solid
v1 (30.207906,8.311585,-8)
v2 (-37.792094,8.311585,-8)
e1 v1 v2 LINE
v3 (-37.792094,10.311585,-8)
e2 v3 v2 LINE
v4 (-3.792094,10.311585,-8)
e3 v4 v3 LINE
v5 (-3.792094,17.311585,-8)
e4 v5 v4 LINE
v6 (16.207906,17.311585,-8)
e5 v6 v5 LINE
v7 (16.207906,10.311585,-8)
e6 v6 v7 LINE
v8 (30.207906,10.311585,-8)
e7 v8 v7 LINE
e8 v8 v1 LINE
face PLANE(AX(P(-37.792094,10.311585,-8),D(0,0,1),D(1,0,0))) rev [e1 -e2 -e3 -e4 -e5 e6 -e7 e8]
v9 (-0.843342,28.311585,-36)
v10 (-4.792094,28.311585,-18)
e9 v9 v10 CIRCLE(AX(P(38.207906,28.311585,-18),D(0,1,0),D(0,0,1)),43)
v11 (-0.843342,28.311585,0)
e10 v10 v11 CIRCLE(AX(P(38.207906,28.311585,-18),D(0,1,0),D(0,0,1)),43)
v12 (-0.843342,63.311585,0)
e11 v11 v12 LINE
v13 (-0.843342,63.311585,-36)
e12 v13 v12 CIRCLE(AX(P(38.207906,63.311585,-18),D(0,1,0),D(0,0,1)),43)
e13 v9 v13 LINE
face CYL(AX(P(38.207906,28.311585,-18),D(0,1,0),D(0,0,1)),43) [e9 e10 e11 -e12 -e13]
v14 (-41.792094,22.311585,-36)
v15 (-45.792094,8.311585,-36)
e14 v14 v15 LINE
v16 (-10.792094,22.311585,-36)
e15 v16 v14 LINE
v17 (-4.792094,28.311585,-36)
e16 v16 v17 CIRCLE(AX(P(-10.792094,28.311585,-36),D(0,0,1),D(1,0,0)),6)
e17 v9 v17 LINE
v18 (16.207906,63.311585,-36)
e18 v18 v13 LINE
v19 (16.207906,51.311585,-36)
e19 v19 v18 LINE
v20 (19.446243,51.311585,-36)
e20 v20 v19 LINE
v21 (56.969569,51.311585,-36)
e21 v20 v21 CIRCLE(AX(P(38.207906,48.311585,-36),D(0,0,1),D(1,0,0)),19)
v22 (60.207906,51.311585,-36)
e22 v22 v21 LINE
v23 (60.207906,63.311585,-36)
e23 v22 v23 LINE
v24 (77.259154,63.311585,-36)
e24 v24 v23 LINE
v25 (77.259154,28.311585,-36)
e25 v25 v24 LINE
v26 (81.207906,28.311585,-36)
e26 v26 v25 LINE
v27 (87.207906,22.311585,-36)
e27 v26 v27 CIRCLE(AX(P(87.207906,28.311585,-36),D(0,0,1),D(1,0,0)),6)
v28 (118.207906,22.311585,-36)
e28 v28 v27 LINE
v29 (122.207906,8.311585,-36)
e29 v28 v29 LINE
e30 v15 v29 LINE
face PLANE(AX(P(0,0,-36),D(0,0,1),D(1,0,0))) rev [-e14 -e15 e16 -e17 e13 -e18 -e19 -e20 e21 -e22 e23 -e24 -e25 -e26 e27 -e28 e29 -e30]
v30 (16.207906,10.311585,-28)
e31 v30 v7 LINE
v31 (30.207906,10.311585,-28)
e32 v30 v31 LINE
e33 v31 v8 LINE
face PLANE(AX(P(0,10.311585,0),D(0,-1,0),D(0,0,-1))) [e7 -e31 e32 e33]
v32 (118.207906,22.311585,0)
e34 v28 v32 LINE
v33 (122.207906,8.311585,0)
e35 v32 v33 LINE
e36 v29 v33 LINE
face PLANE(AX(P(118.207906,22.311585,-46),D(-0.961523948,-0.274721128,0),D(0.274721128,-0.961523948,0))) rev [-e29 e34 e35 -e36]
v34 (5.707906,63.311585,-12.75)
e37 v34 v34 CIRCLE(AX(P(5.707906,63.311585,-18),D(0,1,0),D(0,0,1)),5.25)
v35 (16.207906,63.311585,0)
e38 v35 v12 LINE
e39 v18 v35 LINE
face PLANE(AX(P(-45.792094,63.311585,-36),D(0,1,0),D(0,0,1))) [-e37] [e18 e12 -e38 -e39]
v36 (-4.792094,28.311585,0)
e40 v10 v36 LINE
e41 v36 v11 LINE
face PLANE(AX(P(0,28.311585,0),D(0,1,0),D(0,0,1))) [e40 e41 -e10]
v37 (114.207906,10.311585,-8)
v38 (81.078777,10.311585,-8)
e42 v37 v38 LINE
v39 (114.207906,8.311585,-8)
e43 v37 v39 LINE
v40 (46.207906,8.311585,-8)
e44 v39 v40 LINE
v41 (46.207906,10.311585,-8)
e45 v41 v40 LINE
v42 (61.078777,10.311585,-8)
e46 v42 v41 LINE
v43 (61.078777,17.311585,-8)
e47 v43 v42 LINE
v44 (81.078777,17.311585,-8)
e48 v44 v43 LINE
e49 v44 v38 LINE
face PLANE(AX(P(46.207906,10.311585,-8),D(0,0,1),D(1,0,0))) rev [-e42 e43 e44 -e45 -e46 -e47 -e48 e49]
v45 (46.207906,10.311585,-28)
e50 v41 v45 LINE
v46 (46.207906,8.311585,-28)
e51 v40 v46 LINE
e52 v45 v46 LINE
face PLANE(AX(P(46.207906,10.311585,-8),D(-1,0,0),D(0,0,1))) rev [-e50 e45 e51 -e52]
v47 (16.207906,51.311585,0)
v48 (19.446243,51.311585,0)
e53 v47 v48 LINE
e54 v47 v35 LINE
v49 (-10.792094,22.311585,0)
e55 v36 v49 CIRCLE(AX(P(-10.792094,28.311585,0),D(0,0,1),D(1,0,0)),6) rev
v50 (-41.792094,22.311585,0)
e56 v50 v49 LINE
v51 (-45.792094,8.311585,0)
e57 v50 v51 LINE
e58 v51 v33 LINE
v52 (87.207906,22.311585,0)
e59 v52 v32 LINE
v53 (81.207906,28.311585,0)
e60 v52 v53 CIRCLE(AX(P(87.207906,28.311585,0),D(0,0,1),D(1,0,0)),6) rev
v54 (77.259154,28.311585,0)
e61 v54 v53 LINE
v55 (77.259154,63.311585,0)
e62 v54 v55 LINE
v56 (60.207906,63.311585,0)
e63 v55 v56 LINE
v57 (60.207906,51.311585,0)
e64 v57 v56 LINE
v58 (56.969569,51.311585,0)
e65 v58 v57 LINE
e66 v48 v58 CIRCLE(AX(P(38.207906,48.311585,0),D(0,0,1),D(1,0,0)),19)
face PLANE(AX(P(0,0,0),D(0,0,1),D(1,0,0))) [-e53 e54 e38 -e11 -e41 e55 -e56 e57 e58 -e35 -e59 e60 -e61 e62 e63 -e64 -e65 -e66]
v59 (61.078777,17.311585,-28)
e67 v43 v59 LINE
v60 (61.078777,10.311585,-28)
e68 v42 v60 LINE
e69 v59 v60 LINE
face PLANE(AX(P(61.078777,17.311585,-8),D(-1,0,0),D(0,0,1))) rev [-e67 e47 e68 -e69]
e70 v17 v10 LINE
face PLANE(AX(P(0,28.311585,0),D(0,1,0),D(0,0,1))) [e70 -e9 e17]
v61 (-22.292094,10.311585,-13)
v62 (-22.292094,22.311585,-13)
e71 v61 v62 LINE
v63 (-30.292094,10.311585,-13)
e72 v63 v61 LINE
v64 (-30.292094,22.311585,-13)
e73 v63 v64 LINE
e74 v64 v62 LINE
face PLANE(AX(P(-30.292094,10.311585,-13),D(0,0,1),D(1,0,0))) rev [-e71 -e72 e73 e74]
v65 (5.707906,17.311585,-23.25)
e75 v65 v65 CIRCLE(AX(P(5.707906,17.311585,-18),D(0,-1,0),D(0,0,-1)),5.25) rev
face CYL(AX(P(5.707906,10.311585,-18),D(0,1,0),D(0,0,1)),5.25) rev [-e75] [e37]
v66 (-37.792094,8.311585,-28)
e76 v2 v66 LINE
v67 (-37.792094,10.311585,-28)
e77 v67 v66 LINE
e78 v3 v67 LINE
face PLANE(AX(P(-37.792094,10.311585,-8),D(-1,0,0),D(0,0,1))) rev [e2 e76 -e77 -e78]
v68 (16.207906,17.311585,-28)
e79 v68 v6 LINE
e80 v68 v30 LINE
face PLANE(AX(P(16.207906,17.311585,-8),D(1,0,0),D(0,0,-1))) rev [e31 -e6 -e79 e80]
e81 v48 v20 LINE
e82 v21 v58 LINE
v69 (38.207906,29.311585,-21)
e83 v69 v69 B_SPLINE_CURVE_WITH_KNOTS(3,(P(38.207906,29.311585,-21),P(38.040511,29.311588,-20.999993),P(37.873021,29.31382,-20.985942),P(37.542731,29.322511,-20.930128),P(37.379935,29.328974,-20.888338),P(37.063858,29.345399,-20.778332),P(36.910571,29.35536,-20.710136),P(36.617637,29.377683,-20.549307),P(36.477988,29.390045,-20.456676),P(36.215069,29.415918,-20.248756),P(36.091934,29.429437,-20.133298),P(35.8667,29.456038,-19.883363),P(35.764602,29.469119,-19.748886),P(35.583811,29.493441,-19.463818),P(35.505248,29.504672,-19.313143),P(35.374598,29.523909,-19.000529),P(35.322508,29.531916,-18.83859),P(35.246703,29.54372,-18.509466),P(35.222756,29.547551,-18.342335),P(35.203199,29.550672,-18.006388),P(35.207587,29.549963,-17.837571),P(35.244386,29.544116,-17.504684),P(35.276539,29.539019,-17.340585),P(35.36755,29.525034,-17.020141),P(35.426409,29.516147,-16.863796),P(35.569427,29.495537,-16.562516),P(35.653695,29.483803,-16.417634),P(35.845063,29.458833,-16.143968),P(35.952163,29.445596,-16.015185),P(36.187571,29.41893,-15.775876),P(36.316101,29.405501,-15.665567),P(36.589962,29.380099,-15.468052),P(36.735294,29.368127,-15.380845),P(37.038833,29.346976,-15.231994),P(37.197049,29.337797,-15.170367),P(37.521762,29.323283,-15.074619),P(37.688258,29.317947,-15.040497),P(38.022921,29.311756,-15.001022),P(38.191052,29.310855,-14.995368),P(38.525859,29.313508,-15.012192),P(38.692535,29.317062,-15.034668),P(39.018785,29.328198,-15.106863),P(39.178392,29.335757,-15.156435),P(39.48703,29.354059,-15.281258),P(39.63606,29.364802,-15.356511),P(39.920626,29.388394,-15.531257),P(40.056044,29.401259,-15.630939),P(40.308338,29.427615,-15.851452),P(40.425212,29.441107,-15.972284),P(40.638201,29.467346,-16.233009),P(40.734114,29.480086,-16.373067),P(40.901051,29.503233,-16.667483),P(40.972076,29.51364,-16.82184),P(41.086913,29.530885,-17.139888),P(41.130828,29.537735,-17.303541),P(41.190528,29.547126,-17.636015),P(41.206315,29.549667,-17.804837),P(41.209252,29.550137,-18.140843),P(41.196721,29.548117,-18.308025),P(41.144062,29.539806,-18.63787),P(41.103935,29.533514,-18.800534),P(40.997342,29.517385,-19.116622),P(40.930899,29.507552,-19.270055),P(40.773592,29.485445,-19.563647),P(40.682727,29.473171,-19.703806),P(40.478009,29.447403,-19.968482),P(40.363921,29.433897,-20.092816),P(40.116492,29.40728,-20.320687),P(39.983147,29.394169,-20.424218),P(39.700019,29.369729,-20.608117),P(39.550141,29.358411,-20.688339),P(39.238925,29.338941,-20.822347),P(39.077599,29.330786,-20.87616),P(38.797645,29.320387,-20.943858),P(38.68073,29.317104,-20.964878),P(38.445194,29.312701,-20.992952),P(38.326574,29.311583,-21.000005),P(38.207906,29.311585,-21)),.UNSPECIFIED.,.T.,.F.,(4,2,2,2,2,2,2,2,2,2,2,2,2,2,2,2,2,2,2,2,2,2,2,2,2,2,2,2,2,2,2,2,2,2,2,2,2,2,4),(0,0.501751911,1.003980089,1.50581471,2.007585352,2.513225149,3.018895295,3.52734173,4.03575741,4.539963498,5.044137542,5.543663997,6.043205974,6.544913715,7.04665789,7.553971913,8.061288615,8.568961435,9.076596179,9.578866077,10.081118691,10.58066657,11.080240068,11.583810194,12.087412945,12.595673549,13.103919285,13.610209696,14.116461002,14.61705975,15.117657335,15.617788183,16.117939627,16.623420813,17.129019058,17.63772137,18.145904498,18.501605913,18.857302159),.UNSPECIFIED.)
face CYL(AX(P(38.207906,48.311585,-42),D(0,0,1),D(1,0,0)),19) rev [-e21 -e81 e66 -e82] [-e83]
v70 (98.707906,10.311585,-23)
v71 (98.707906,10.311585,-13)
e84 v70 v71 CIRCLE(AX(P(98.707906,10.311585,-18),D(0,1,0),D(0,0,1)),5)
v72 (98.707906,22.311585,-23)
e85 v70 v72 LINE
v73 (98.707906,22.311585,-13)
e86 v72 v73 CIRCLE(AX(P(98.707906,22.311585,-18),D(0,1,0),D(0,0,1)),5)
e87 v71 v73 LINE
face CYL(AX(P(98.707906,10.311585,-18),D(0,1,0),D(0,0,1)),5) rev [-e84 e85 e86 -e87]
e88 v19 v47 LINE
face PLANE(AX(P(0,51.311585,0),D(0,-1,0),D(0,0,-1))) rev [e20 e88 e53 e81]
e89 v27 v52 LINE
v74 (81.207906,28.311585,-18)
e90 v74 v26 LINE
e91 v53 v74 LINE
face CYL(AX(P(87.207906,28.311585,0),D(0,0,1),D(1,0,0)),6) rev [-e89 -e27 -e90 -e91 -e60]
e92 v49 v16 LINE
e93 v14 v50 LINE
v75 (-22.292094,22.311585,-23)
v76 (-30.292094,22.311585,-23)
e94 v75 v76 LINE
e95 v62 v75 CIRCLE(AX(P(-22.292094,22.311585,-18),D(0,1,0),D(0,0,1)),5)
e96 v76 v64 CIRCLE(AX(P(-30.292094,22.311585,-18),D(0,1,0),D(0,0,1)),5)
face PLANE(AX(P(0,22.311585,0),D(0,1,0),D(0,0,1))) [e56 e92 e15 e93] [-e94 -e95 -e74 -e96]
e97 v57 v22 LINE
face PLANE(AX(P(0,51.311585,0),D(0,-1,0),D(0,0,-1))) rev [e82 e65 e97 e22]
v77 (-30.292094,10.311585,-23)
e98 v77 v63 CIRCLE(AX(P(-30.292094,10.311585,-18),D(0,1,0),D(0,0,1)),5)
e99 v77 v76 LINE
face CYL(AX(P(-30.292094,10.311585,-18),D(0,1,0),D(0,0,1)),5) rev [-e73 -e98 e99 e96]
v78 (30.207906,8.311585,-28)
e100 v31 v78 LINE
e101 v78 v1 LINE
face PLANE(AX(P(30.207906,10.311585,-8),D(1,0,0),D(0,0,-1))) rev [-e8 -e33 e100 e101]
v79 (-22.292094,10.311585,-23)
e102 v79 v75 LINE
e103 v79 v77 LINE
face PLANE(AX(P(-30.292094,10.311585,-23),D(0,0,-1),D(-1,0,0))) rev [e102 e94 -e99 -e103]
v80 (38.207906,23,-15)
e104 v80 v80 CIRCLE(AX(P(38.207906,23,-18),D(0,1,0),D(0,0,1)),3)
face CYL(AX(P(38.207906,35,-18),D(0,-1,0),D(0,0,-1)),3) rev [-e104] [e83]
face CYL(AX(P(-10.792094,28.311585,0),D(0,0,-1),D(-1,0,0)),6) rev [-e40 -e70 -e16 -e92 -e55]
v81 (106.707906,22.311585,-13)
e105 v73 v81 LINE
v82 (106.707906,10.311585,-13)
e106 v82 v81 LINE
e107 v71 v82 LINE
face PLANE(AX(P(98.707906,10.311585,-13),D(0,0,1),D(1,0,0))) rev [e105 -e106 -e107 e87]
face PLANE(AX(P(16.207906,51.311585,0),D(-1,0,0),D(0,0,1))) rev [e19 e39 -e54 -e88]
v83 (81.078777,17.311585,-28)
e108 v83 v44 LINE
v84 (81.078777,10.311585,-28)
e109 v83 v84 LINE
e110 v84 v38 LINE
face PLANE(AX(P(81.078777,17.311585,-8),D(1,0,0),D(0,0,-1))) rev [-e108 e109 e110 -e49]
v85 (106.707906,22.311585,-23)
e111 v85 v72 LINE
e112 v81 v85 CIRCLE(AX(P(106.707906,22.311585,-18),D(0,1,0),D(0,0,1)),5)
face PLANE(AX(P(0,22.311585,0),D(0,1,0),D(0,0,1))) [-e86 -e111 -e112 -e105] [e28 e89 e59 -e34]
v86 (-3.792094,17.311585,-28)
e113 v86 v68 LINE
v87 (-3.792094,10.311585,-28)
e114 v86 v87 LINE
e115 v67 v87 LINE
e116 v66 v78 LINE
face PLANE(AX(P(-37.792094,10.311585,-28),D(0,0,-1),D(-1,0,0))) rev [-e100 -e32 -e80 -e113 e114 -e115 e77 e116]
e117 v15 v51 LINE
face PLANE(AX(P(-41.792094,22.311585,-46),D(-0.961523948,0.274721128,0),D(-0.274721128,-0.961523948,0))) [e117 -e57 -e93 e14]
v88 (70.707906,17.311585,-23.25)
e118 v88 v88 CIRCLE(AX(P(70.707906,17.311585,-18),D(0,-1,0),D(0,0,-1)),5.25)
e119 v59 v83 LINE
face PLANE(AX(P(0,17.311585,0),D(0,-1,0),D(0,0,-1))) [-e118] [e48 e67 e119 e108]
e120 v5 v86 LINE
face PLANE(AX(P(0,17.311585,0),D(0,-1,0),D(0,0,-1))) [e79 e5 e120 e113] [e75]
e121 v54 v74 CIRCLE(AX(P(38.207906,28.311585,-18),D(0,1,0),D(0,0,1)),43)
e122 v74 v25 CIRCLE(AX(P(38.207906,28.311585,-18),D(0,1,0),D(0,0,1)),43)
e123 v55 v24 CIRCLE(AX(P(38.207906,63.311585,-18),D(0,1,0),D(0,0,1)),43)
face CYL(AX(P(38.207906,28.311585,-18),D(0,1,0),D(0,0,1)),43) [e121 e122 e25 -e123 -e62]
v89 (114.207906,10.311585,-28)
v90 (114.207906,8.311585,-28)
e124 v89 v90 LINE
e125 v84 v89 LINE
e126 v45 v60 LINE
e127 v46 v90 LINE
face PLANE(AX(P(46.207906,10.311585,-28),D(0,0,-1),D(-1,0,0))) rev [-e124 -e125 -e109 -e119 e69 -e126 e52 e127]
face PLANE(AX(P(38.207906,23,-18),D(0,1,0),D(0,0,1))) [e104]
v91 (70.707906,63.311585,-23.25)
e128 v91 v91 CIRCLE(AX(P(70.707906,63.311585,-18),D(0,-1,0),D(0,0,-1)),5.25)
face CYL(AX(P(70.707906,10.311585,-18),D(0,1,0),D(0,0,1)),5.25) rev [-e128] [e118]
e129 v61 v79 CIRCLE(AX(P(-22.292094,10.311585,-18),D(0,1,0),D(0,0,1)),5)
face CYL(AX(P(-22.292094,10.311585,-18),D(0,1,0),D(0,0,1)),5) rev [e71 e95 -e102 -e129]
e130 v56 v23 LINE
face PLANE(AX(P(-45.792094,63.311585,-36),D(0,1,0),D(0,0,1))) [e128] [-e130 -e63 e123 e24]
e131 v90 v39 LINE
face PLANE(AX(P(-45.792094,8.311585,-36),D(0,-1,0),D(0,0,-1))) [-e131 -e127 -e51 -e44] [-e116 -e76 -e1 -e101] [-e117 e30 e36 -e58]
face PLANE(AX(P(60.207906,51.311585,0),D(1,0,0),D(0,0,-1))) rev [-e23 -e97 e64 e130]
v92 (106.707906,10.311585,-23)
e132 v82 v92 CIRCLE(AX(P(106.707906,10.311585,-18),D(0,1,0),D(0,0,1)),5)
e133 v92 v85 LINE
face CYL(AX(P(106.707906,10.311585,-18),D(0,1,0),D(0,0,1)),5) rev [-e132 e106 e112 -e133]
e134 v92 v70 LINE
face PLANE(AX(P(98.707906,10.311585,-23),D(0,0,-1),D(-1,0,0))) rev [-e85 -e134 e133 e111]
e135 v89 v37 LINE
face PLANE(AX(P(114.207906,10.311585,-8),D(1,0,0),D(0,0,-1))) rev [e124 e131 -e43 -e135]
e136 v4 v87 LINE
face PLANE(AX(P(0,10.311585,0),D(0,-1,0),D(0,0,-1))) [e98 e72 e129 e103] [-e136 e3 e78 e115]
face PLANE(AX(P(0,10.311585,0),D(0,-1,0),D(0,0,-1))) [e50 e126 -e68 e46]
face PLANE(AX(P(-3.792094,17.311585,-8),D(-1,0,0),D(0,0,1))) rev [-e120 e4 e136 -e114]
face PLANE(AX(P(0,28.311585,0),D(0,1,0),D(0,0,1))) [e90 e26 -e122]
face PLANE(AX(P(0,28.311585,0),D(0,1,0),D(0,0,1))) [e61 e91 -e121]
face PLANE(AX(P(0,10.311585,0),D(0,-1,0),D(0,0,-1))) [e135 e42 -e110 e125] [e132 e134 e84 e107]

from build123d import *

# Parameters (mm, degrees)
SKETCH1_W                = 168
SKETCH1_H                = 55
BOSS_EXTRUDE2_DEPTH      = 36
CUT_EXTRUDE2_DEPTH       = 41
CUT_EXTRUDE4_DEPTH       = 35
SKETCH5_W                = 44
SKETCH5_H                = 36
CUT_EXTRUDE5_DEPTH       = 12
CUT_EXTRUDE6_DEPTH       = 42
SKETCH11_R               = 5.25
CUT_EXTRUDE8_DEPTH       = 53
CUT_EXTRUDE9_DEPTH       = 46
FILLET1_R                = 6
SKETCH30_W               = 68
SKETCH30_H               = 20
CUT_EXTRUDE14_DEPTH      = 2
CUT_EXTRUDE16_DEPTH      = 6
CUT_EXTRUDE16_DEPTH_BACK = 6
SKETCH31_R               = 3
SKETCH32_W               = 20
SKETCH32_H               = 20
CUT_EXTRUDE19_DEPTH      = 7
CUT_EXTRUDE21_DEPTH      = 12


with BuildPart() as part:
    # Sketch1 → Boss-Extrude2 (new body)
    with BuildSketch(Plane.XY):
        with Locations((38.207905975, 35.811584747)):
            Rectangle(SKETCH1_W, SKETCH1_H)
    extrude(amount=-BOSS_EXTRUDE2_DEPTH)

    # Sketch3 → Cut-Extrude2 (cut)
    with BuildSketch(Plane(origin=(0, 63.311584747, 0), x_dir=(1, 0, 0), z_dir=(0, 1, 0))):
        Polygon((122.207905975, 36), (81.207905975, 36), (81.207905975, 18.000000234), (81.207905975, 0), (122.207905975, 0), align=None)
        Polygon((-4.792094025, 18), (-4.792094025, 36), (-45.792094025, 36), (-45.792094025, 0), (-4.792094025, 0), align=None)
    extrude(amount=-CUT_EXTRUDE2_DEPTH, mode=Mode.SUBTRACT)

    # Sketch4 → Cut-Extrude4 (cut)
    with BuildSketch(Plane(origin=(0, 63.311584747, 0), x_dir=(1, 0, 0), z_dir=(0, 1, 0))):
        with BuildLine():
            Line((-0.843342405, 36), (-4.792094025, 36))
            Line((-4.792094025, 36), (-4.792094025, 18))
            ThreePointArc((-4.792094025, 18), (-3.793306391, 27.214019744), (-0.843342405, 36))
        make_face()
        with BuildLine():
            ThreePointArc((-0.843342405, 0), (-3.793306391, 8.785980256), (-4.792094025, 18))
            Line((-4.792094025, 18), (-4.792094025, 0))
            Line((-4.792094025, 0), (-0.843342405, 0))
        make_face()
        with BuildLine():
            Line((81.207905975, 36), (77.259154354, 36))
            ThreePointArc((77.259154354, 36), (80.20911834, 27.214019744), (81.207905975, 18))
            Line((81.207905975, 18), (81.207905975, 36))
        make_face()
        with BuildLine():
            ThreePointArc((81.207905975, 18), (80.20911834, 8.785980256), (77.259154354, 0))
            Line((77.259154354, 0), (81.207905975, 0))
            Line((81.207905975, 0), (81.207905975, 18))
        make_face()
    extrude(amount=-CUT_EXTRUDE4_DEPTH, mode=Mode.SUBTRACT)

    # Sketch5 → Cut-Extrude5 (cut)
    with BuildSketch(Plane(origin=(0, 63.311584747, 0), x_dir=(1, 0, 0), z_dir=(0, 1, 0))):
        with Locations((38.207905975, 18)):
            Rectangle(SKETCH5_W, SKETCH5_H)
    extrude(amount=-CUT_EXTRUDE5_DEPTH, mode=Mode.SUBTRACT)

    # Sketch8 → Cut-Extrude6 (cut)
    with BuildSketch(Plane.XY):
        with BuildLine():
            ThreePointArc((19.446242935, 51.311584747), (36.703179712, 29.37126271), (57.207905975, 48.311584747))
            ThreePointArc((57.207905975, 48.311584747), (57.148228012, 49.81631101), (56.969569014, 51.311584747))
            Line((56.969569014, 51.311584747), (19.446242935, 51.311584747))
        make_face()
        with BuildLine():
            Line((19.446242935, 51.311584747), (56.969569014, 51.311584747))
            ThreePointArc((56.969569014, 51.311584747), (38.207905975, 67.311584747), (19.446242935, 51.311584747))
        make_face()
    extrude(amount=-CUT_EXTRUDE6_DEPTH, mode=Mode.SUBTRACT)

    # Sketch11 → Cut-Extrude8 (cut)
    with BuildSketch(Plane(origin=(0, 63.311584747, 0), x_dir=(1, 0, 0), z_dir=(0, 1, 0))):
        with Locations(Location((5.707905975, 18, 0), (0, 0, 270))):
            Circle(SKETCH11_R)
        with Locations(Location((70.707905975, 18, 0), (0, 0, 90))):
            Circle(SKETCH11_R)
    extrude(amount=-CUT_EXTRUDE8_DEPTH, mode=Mode.SUBTRACT)

    # Sketch13 → Cut-Extrude9 (cut)
    with BuildSketch(Plane.XY):
        Polygon((-45.792094025, 22.311584747), (-45.792094025, 8.311584747), (-41.792094025, 22.311584747), align=None)
        Polygon((122.207905975, 22.311584747), (118.207905975, 22.311584747), (122.207905975, 8.311584747), align=None)
    extrude(amount=-CUT_EXTRUDE9_DEPTH, mode=Mode.SUBTRACT)

    # Fillet1
    fillet1_edges = [part.edges().sort_by_distance(p)[0] for p in [
        (81.207905975, 22.311584747, -18),
        (-4.792094025, 22.311584747, -18),
    ]]
    fillet(fillet1_edges, radius=FILLET1_R - 0.0001)  # a hair under: the kernel refuses the full size

    # Sketch30 → Cut-Extrude14 (cut)
    with BuildSketch(Plane.XZ.offset(-8.311584747)):
        with Locations((-3.792094025, -18)):
            Rectangle(SKETCH30_W, SKETCH30_H)
        with Locations((80.207905975, -18)):
            Rectangle(SKETCH30_W, SKETCH30_H)
    extrude(amount=-CUT_EXTRUDE14_DEPTH, mode=Mode.SUBTRACT)

    # Sketch31 → Cut-Extrude16 (cut, two sides: drawn at the far end of the back side and taken through both)
    with BuildSketch(Plane(origin=(0, 29, 0), x_dir=(1, 0, 0), z_dir=(0, 1, 0)).offset(-CUT_EXTRUDE16_DEPTH_BACK)):
        with Locations(Location((38.207905975, 18, 0), (0, 0, 90))):
            Circle(SKETCH31_R)
    extrude(amount=CUT_EXTRUDE16_DEPTH + CUT_EXTRUDE16_DEPTH_BACK, mode=Mode.SUBTRACT)

    # Sketch32 → Cut-Extrude19 (cut)
    with BuildSketch(Plane.XZ.offset(-10.311584747)):
        with Locations((6.207905975, -18)):
            Rectangle(SKETCH32_W, SKETCH32_H)
        with Locations((71.078776846, -18)):
            Rectangle(SKETCH32_W, SKETCH32_H)
    extrude(amount=-CUT_EXTRUDE19_DEPTH, mode=Mode.SUBTRACT)

    # Sketch15 → Cut-Extrude21 (cut)
    with BuildSketch(Plane(origin=(0, 22.311584747, 0), x_dir=(1, 0, 0), z_dir=(0, 1, 0))):
        with BuildLine():
            Line((-30.292094025, 23), (-22.292094025, 23))
            ThreePointArc((-22.292094025, 23), (-17.292094025, 18), (-22.292094025, 13))
            Line((-22.292094025, 13), (-30.292094025, 13))
            ThreePointArc((-30.292094025, 13), (-35.292094025, 18), (-30.292094025, 23))
        make_face()
        with BuildLine():
            Line((98.707905975, 23), (106.707905975, 23))
            ThreePointArc((106.707905975, 23), (111.707905975, 18), (106.707905975, 13))
            Line((106.707905975, 13), (98.707905975, 13))
            ThreePointArc((98.707905975, 13), (93.707905975, 18), (98.707905975, 23))
        make_face()
    extrude(amount=-CUT_EXTRUDE21_DEPTH, mode=Mode.SUBTRACT)


solid = part.part
